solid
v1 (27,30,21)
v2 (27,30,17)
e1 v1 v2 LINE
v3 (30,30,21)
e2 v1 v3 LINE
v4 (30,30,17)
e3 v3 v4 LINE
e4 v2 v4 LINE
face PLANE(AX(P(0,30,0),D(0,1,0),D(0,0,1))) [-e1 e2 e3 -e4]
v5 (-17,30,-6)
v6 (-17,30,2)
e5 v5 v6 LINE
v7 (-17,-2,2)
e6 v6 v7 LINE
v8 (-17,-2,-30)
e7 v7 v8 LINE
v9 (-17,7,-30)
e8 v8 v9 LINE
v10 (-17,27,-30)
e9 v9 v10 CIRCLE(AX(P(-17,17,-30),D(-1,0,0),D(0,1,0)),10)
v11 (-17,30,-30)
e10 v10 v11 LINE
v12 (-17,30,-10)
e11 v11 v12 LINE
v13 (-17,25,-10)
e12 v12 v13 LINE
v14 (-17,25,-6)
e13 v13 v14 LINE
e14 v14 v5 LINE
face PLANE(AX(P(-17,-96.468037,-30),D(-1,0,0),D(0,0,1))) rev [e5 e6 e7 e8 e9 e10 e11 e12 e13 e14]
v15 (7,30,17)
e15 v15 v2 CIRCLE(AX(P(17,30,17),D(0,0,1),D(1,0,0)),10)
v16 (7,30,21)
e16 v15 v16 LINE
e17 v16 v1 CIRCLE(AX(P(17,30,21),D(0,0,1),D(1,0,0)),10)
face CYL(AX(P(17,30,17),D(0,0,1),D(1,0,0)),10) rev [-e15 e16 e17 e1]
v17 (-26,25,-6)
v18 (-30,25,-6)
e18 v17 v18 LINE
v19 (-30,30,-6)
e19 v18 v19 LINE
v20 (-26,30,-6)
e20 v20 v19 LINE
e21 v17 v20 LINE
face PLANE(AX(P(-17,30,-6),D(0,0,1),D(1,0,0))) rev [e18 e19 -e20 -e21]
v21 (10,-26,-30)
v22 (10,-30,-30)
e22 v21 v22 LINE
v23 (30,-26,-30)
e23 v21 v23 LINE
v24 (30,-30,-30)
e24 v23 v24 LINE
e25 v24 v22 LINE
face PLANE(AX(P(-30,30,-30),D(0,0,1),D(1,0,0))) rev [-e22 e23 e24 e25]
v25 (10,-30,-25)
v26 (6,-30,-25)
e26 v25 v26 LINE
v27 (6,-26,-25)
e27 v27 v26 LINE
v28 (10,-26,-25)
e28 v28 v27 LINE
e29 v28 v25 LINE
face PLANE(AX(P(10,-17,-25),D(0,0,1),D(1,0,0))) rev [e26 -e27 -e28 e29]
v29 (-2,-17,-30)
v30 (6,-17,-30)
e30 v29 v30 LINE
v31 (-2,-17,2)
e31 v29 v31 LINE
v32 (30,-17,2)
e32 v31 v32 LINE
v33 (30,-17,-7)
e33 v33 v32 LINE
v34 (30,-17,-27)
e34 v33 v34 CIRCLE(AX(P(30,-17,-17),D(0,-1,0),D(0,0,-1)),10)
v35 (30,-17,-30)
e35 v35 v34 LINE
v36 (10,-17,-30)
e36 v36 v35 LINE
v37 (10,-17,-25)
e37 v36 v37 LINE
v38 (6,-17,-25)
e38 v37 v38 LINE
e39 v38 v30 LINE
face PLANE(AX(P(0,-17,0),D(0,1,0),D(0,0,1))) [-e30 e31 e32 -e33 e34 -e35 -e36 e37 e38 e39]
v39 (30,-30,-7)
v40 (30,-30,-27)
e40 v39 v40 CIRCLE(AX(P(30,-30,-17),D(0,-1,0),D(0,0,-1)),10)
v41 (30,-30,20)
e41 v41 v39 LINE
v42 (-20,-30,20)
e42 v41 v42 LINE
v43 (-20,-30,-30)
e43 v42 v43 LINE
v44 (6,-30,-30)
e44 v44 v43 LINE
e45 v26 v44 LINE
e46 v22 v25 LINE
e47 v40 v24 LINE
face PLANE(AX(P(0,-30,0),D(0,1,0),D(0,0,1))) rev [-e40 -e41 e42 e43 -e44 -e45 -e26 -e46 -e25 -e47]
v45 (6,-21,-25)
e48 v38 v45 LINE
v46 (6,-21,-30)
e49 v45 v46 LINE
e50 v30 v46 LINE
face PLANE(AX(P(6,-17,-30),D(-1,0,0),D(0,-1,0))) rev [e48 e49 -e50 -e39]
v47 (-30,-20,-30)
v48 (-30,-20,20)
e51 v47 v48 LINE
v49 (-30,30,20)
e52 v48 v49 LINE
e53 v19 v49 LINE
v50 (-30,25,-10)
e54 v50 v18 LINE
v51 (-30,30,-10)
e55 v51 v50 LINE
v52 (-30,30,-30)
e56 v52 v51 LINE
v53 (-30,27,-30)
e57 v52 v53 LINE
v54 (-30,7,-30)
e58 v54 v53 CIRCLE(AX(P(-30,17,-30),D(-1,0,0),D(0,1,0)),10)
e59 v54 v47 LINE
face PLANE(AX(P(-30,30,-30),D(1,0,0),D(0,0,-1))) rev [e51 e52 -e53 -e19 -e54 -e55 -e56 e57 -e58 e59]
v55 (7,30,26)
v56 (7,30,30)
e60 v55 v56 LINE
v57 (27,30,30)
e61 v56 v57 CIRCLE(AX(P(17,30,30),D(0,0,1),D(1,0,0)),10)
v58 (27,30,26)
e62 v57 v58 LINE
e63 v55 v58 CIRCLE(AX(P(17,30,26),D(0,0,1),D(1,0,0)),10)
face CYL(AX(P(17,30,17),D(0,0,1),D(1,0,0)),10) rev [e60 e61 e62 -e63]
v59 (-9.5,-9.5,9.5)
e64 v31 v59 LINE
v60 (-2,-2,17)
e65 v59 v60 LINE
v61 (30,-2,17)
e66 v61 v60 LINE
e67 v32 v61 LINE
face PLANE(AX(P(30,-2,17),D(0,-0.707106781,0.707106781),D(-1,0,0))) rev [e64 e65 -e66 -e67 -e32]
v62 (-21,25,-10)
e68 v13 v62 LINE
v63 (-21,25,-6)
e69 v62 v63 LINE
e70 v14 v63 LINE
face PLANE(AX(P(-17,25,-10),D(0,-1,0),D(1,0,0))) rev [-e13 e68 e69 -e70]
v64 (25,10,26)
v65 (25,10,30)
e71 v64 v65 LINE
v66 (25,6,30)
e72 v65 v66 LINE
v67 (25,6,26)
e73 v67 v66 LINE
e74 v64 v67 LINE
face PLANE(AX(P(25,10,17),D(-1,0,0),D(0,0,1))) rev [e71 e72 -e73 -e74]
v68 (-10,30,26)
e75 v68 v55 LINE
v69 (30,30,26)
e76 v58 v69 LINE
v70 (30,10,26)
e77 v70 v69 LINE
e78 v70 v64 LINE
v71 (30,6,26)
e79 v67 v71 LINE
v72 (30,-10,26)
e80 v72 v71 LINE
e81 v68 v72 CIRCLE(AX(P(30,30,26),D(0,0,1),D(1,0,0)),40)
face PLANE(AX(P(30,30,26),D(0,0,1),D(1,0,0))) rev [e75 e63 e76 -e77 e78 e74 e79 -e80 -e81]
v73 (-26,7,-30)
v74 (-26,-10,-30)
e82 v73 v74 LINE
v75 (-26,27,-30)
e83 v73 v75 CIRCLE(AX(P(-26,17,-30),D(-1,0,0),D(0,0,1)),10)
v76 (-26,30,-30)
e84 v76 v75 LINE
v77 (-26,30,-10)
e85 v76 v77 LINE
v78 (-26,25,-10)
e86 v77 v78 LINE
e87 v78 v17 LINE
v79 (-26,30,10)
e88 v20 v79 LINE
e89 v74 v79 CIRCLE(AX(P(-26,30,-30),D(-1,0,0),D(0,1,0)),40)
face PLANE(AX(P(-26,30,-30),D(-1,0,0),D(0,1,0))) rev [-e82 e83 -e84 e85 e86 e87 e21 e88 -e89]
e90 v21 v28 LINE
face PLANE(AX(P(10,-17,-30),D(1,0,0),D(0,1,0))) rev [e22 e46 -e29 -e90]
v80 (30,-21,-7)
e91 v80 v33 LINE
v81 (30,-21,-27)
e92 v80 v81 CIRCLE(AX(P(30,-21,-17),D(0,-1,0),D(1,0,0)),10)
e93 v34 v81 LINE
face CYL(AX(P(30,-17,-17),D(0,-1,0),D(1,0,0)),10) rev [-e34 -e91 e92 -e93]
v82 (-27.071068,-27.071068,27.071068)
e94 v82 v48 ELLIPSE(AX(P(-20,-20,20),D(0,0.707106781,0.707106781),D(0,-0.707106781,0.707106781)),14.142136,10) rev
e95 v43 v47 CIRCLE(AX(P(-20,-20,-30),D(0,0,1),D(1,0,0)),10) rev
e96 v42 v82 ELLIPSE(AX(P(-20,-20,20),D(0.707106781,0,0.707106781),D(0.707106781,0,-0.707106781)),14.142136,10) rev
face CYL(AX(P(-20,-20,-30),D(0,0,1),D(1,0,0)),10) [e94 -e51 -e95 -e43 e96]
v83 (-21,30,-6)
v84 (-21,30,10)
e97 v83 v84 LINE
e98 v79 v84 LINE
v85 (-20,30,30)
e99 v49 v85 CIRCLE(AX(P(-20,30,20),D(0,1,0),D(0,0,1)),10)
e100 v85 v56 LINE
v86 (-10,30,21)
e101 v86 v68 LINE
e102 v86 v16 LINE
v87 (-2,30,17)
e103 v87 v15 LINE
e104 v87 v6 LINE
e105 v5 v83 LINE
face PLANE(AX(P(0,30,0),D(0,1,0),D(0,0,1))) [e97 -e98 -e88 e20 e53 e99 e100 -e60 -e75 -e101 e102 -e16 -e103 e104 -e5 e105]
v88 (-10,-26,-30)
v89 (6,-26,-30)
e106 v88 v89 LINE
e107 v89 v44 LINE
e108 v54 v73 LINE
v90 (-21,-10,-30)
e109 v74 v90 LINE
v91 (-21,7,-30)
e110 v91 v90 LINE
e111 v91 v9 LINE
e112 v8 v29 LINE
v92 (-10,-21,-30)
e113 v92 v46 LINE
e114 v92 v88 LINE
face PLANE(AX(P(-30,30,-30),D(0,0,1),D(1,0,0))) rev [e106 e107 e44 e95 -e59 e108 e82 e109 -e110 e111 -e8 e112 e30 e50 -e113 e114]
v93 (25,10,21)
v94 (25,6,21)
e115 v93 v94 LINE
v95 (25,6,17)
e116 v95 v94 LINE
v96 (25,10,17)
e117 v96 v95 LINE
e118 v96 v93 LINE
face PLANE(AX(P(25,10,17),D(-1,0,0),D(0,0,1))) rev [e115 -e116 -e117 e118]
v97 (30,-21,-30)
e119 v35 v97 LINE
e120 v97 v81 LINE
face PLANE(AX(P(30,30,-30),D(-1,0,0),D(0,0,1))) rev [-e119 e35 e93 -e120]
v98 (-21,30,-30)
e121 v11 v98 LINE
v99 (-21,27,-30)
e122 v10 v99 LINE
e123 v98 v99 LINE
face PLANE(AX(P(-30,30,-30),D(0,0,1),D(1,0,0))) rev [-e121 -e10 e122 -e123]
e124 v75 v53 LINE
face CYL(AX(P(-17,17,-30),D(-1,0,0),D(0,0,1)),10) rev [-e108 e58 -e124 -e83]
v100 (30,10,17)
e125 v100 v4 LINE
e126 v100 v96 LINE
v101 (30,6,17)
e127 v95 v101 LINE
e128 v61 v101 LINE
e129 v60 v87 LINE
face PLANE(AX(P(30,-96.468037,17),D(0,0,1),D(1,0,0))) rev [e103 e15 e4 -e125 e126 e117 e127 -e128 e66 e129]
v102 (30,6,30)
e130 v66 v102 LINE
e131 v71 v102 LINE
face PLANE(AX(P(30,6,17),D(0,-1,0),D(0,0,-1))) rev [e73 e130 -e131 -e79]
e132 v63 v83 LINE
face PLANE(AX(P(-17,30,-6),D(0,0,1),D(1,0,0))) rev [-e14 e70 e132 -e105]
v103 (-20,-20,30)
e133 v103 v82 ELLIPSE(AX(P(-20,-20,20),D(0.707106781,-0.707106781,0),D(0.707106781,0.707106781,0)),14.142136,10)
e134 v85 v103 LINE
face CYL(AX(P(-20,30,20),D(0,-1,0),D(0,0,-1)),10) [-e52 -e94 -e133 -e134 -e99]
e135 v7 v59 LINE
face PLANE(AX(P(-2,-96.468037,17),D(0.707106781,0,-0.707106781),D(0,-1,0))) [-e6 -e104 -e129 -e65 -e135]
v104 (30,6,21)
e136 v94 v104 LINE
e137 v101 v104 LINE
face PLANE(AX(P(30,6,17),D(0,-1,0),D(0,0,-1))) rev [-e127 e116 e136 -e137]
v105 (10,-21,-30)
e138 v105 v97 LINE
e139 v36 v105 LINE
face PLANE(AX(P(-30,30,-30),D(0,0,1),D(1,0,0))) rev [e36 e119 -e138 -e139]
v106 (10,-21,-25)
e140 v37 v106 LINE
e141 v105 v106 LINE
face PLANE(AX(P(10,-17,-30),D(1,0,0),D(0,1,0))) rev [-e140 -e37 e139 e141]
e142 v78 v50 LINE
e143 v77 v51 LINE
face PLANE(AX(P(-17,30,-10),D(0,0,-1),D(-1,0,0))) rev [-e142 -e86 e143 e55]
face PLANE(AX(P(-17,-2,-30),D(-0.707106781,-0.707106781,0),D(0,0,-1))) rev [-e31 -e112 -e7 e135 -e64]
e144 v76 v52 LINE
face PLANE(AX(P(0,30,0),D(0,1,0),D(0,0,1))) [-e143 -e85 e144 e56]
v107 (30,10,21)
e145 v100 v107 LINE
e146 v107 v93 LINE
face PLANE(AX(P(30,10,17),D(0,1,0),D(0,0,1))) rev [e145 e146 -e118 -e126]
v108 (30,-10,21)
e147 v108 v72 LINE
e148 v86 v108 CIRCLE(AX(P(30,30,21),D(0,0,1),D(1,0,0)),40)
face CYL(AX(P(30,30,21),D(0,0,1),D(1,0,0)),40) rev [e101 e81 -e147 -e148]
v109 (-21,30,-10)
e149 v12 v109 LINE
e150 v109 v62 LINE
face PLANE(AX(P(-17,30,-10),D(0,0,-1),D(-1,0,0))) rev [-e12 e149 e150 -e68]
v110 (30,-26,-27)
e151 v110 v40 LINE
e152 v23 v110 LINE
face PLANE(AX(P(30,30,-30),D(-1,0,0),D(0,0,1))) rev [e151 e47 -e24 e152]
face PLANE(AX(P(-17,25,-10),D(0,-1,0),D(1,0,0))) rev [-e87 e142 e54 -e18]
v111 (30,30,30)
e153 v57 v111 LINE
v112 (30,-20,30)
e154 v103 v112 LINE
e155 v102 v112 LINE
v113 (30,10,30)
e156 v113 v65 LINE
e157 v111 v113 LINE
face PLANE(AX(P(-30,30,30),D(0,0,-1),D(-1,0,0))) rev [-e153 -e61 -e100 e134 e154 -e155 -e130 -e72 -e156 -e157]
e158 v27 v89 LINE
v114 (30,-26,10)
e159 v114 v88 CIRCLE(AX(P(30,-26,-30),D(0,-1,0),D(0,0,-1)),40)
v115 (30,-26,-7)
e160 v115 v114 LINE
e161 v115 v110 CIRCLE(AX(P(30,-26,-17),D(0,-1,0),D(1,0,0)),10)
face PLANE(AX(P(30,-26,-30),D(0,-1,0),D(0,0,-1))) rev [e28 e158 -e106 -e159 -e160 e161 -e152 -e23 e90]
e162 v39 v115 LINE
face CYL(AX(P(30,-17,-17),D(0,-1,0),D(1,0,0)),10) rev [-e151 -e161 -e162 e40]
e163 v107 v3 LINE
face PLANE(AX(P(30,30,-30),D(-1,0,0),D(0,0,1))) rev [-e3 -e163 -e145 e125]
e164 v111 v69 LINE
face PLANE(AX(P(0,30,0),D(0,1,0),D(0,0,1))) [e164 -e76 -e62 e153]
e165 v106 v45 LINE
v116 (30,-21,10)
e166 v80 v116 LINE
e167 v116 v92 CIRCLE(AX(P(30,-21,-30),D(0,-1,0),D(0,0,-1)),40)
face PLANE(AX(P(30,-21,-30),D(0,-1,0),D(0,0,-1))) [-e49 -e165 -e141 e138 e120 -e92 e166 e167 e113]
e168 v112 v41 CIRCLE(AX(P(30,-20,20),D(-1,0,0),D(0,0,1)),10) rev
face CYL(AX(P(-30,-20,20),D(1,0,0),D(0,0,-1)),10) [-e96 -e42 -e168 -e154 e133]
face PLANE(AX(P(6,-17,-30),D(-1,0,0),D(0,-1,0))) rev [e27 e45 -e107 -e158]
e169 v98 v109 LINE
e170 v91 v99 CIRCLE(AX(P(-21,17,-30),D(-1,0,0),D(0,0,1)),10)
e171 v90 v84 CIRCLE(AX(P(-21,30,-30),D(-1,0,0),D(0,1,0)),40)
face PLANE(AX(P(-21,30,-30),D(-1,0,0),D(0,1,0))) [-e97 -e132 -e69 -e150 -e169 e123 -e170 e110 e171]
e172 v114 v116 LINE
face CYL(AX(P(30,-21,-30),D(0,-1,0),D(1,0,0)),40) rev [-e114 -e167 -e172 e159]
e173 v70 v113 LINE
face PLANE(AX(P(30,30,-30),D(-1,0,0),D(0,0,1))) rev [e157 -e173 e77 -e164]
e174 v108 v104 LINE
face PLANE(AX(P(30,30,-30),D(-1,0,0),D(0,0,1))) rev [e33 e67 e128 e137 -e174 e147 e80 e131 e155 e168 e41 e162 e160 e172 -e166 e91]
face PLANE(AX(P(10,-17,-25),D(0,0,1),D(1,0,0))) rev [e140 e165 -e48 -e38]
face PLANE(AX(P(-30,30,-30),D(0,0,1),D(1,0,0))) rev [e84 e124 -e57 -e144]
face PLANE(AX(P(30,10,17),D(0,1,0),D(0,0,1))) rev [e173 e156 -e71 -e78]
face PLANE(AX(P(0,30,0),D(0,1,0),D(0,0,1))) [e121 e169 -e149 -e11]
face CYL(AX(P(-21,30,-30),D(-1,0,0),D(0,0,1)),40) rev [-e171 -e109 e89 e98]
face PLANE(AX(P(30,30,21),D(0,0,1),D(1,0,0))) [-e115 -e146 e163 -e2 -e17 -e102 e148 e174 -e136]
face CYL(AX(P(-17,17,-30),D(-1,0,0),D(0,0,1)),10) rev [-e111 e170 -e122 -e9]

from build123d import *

# Parameters (mm, degrees)
SKETCH_1_W               = 60
SKETCH_1_H               = 60
EXTRUDE_2_DEPTH          = 30
FILLET_4_R               = 10
FILLET_5_R               = 10
SKETCH_5_W               = 47
SKETCH_5_H               = 47
CUT_EXTRUDE_4_DEPTH      = 47
CHAMFER_3_SIZE           = 15
CHAMFER_4_SIZE           = 15
CUT_EXTRUDE_START        = -4
SKETCH_6_R               = 40
CUT_EXTRUDE_5_DEPTH      = 5
SKETCH_7_R               = 10
SKETCH_7_W               = 5
SKETCH_7_H               = 4
CUT_EXTRUDE_6_DEPTH      = 13
PATTERN_CIRCULAR_5_COUNT = 3


with BuildPart() as part:
    # 草图1 → 凸台-拉伸2 (new, symmetric)
    with BuildSketch(Plane(origin=(0, 0, 0), x_dir=(1, 0, 0), z_dir=(0, 1, 0))):
        Rectangle(SKETCH_1_W, SKETCH_1_H)
    extrude(amount=EXTRUDE_2_DEPTH, both=True)

    # 圆角4
    fillet_4_edges = [part.edges().sort_by_distance(p)[0] for p in [
        (0, -30, 30),
        (-30, -30, 0),
    ]]
    fillet(fillet_4_edges, radius=FILLET_4_R)

    # 圆角5
    # the kernel refuses this fillet: 10 mm, written as the material it takes off along each edge
    with BuildSketch(Plane(origin=(-30, -45, 30), x_dir=(0, 0, -1), z_dir=(0, 1, 0))) as fillet_5_piece_1:
        with BuildLine():
            CenterArc((FILLET_5_R, -FILLET_5_R), FILLET_5_R, 90, 90)
            Line((0, -FILLET_5_R), (0, 0))
            Line((0, 0), (FILLET_5_R, 0))
        make_face()
    extrude(amount=100, mode=Mode.SUBTRACT)

    # 草图5 → 切除-拉伸4 (cut)
    with BuildSketch(Plane(origin=(0, 30, 0), x_dir=(1, 0, 0), z_dir=(0, 1, 0))):
        with Locations((6.5, 6.5)):
            Rectangle(SKETCH_5_W, SKETCH_5_H)
    extrude(amount=-CUT_EXTRUDE_4_DEPTH, mode=Mode.SUBTRACT)

    # 倒角3
    chamfer_3_edges = [part.edges().sort_by_distance(p)[0] for p in [
        (6.5, -17, 17),
        (-17, -17, -6.5),
    ]]
    chamfer(chamfer_3_edges, length=CHAMFER_3_SIZE)

    # 倒角4
    chamfer_4_edges = [part.edges().sort_by_distance(p)[0] for p in [
        (-17, 14, 17),
    ]]
    chamfer(chamfer_4_edges, length=CHAMFER_4_SIZE)

    # 草图6 → 切除-拉伸5 (cut)
    with BuildSketch(Plane.XY.offset(30).offset(CUT_EXTRUDE_START)):
        with Locations((30, 30)):
            Circle(SKETCH_6_R)
    cut_extrude_5 = extrude(amount=-CUT_EXTRUDE_5_DEPTH, mode=Mode.SUBTRACT)

    # 草图7 → 切除-拉伸6 (cut)
    with BuildSketch(Plane.XY.offset(30)):
        with Locations((17, 30)):
            Circle(SKETCH_7_R)
        with Locations((27.5, 8)):
            Rectangle(SKETCH_7_W, SKETCH_7_H)
    cut_extrude_6 = extrude(amount=-CUT_EXTRUDE_6_DEPTH, mode=Mode.SUBTRACT)

    # 阵列(圆周)5: 切除-拉伸5, 切除-拉伸6 ×3 about axis
    pattern_circular_5_axis = Axis((0, 0, 0), (-0.5773502691896262, -0.5773502691896245, 0.5773502691896266))
    add([cut_extrude_5.rotate(pattern_circular_5_axis, i * 360 / PATTERN_CIRCULAR_5_COUNT) for i in range(1, PATTERN_CIRCULAR_5_COUNT)], mode=Mode.SUBTRACT)
    add([cut_extrude_6.rotate(pattern_circular_5_axis, i * 360 / PATTERN_CIRCULAR_5_COUNT) for i in range(1, PATTERN_CIRCULAR_5_COUNT)], mode=Mode.SUBTRACT)


solid = part.part
